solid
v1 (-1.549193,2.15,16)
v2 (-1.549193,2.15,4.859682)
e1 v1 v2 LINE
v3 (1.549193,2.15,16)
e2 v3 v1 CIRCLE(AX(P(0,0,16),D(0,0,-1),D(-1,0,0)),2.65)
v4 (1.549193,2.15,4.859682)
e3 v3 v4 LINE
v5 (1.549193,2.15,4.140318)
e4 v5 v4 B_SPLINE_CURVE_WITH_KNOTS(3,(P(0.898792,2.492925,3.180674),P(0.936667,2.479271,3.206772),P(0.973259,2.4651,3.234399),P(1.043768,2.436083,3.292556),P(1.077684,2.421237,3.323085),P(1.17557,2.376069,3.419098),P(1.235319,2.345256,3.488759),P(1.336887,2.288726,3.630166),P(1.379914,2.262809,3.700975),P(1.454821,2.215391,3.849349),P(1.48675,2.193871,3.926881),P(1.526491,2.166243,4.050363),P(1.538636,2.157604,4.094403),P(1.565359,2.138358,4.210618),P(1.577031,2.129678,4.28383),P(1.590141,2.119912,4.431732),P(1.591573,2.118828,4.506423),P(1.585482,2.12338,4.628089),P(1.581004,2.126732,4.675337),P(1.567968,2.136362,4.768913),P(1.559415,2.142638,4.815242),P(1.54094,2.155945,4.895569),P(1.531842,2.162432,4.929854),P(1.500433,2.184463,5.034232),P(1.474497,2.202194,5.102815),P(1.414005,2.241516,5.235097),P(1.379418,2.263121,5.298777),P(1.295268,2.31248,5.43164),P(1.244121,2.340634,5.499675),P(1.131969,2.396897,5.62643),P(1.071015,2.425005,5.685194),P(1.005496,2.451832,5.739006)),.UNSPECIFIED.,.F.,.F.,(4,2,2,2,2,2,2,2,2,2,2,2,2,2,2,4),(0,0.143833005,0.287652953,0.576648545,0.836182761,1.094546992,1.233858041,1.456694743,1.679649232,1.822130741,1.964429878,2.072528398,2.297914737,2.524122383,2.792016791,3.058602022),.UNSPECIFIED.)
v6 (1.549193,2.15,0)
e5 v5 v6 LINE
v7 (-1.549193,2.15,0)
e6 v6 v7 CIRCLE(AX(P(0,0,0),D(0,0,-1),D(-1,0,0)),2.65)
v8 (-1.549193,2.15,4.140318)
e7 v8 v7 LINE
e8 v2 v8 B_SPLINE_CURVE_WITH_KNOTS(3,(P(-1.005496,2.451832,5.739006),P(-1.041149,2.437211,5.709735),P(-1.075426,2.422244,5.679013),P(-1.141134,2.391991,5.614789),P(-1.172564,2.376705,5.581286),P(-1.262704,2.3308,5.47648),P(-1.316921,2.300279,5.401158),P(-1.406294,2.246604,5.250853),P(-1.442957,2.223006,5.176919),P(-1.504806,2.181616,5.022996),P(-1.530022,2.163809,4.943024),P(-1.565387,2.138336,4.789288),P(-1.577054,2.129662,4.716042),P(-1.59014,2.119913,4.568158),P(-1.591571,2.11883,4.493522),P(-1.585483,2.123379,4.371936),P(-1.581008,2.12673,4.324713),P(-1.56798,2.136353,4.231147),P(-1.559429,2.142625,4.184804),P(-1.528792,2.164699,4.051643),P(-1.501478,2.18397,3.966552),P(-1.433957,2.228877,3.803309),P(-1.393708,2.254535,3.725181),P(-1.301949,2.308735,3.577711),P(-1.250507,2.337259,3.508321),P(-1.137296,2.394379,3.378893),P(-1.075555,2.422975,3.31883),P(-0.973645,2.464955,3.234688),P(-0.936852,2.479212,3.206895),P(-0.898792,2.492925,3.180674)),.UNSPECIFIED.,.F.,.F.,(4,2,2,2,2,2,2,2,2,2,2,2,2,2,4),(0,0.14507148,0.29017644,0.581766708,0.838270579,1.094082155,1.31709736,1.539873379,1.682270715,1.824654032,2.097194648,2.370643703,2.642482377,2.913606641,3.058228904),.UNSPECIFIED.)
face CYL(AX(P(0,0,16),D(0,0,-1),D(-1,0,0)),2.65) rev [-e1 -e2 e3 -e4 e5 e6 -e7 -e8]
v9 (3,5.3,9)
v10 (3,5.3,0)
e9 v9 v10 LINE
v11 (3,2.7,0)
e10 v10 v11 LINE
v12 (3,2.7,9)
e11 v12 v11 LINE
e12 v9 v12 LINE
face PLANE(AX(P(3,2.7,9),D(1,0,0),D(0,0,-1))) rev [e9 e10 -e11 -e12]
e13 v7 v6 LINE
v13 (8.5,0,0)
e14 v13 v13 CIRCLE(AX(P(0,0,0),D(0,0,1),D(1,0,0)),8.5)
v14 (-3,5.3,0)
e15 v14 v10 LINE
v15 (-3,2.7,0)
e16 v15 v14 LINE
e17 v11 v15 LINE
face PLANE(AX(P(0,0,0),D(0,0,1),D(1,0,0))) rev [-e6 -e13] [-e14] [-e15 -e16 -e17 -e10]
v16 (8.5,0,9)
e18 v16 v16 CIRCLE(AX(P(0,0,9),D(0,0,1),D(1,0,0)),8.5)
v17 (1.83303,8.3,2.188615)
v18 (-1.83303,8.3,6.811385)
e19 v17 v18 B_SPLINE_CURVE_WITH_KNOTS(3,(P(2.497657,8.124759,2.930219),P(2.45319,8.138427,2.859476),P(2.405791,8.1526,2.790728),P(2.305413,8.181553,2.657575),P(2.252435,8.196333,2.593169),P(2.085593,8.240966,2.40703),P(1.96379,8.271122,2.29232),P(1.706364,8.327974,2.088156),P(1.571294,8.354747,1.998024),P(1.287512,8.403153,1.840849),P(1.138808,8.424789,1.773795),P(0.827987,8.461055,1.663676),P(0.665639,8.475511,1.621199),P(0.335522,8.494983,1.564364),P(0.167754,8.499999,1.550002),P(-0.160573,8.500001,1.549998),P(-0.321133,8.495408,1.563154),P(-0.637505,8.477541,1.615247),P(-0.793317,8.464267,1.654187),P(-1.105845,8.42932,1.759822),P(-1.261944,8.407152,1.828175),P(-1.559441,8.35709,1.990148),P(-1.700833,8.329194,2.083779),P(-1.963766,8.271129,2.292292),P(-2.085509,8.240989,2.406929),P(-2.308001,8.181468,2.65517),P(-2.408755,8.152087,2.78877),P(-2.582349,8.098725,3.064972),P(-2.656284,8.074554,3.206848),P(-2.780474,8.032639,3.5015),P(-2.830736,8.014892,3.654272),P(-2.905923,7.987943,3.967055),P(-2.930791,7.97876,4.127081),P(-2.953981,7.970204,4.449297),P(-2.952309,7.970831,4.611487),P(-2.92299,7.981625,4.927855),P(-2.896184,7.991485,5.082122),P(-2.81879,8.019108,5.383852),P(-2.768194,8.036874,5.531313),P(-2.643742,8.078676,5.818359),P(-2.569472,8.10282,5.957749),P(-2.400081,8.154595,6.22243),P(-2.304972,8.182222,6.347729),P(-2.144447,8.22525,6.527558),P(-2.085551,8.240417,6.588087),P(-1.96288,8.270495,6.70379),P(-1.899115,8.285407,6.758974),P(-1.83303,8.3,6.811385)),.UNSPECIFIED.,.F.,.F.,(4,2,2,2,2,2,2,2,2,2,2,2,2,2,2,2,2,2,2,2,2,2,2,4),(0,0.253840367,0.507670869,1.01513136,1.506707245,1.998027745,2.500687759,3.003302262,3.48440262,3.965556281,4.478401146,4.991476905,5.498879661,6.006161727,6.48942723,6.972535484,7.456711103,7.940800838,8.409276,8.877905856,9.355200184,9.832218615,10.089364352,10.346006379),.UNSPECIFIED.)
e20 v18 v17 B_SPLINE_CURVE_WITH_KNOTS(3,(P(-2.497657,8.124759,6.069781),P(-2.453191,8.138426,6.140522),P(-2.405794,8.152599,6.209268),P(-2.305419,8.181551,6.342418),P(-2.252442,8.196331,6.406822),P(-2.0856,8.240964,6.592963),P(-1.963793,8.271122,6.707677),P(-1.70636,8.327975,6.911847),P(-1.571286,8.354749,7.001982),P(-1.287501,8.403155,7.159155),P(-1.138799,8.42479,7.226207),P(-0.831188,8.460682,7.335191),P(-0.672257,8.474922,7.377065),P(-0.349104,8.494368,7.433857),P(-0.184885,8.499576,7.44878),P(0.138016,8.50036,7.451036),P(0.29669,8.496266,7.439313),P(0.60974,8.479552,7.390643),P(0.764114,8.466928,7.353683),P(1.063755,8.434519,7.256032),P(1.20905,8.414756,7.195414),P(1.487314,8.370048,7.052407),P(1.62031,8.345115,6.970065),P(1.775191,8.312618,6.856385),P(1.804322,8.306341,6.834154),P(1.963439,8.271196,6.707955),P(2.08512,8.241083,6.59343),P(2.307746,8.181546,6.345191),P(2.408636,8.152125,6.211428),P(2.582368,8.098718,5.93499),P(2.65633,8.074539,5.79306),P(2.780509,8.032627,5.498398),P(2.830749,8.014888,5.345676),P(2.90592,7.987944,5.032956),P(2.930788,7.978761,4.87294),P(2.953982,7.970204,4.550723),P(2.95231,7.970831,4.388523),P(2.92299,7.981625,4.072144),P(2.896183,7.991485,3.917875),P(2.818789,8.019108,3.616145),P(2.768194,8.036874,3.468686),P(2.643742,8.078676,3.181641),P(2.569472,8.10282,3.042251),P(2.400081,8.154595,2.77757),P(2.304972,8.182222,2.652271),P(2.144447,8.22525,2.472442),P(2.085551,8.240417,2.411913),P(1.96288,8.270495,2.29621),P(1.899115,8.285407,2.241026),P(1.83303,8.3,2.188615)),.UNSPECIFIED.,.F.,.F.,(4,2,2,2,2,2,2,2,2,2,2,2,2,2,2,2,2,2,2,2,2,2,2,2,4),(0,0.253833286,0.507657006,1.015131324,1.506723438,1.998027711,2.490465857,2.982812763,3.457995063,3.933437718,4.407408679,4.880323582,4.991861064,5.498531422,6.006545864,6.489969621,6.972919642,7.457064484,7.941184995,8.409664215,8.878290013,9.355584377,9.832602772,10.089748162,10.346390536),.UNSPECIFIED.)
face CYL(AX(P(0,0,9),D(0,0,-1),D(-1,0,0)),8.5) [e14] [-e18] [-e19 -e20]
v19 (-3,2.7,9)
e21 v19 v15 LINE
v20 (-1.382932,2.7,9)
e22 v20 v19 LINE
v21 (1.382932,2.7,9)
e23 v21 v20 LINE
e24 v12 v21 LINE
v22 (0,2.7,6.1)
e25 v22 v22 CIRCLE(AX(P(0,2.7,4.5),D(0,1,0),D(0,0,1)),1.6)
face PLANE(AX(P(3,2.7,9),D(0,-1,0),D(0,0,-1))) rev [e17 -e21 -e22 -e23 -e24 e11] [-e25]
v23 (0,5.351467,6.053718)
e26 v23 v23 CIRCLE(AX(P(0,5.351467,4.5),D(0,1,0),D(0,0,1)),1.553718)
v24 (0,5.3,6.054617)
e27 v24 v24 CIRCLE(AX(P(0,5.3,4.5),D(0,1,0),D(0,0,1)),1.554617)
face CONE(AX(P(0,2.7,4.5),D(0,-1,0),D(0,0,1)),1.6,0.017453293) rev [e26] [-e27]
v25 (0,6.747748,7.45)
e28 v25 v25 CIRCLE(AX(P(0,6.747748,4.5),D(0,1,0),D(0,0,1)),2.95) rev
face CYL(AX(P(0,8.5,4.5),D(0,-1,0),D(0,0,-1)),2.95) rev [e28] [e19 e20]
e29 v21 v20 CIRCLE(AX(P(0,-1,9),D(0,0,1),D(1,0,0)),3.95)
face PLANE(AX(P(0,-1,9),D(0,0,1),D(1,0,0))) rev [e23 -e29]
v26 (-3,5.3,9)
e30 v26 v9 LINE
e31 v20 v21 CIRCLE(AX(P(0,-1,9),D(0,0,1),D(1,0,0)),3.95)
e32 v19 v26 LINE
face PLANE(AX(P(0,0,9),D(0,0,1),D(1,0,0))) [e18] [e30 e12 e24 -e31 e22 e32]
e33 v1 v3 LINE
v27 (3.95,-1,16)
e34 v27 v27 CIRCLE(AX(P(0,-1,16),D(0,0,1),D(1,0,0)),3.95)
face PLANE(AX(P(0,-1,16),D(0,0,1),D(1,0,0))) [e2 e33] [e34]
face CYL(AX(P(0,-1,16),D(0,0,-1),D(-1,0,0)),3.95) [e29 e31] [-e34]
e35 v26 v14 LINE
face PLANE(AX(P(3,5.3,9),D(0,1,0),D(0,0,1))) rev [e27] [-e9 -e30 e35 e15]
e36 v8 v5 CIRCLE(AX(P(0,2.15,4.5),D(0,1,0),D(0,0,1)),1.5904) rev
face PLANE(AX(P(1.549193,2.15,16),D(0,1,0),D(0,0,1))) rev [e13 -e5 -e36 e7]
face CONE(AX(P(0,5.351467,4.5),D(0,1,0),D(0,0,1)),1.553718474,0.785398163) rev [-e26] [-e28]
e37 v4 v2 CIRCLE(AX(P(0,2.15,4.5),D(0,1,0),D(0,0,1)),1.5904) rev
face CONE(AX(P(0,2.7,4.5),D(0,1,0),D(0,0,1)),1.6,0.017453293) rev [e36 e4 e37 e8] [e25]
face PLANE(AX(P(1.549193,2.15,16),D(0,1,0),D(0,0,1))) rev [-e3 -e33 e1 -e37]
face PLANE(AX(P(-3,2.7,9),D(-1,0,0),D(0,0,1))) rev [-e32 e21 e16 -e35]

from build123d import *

# Parameters (mm, degrees)
ESQUISSE1_R             = 8.5
BOSS_EXTRU_1_DEPTH      = 9
ESQUISSE2_W             = 6
ESQUISSE2_H             = 2.6
ENL_V_MAT_EXTRU_1_DEPTH = 16.016657418
ESQUISSE7_R             = 2.95
ENL_V_MAT_EXTRU_8_DEPTH = 21.868397324
ESQUISSE9_R             = 3.95
BOSS_EXTRU_2_DEPTH      = 7
ENL_V_MAT_EXTRU_9_DEPTH = 21.012496182


with BuildPart() as part:
    # Esquisse1 → Boss.-Extru.1 (new body)
    with BuildSketch(Plane.XY):
        Circle(ESQUISSE1_R)
    extrude(amount=BOSS_EXTRU_1_DEPTH)

    # Esquisse2 → Enlèv. mat.-Extru.1 (cut, through all)
    with BuildSketch(Plane(origin=(0, 0, 0), x_dir=(-1, 0, 0), z_dir=(0, 0, -1))):
        with Locations((0, 4)):
            Rectangle(ESQUISSE2_W, ESQUISSE2_H)
    extrude(amount=-ENL_V_MAT_EXTRU_1_DEPTH, mode=Mode.SUBTRACT)

    # Enlèv. mat.-Extru.2: read off the stored shape, not the designer's step
    # Enlèv. mat.-Extru.2 outline → Enlèv. mat.-Extru.2 (revolve, cut)
    with BuildSketch(Plane.XY.offset(4.5)):
        Polygon((0, 5.3), (1.554616831, 5.3), (1.498760014, 8.500034923), (0, 8.500034923), align=None)
        Polygon((1.6, 2.7), (0, 2.7), (0, 0.7), (1.56508987, 0.7), align=None)
    revolve(axis=Axis((0, 0, 4.5), (0, 1, 0)), mode=Mode.SUBTRACT)

    # Esquisse7 → Enlèv. mat.-Extru.8 (cut, through all)
    with BuildSketch(Plane(origin=(0, 8.3, 0), x_dir=(1, 0, 0), z_dir=(0, 1, 0))):
        with Locations((0, -4.5)):
            Circle(ESQUISSE7_R)
    extrude(amount=ENL_V_MAT_EXTRU_8_DEPTH, mode=Mode.SUBTRACT)

    # Chanfrein1: read off the stored shape, not the designer's step
    # Chanfrein1 outline → Chanfrein1 (revolve, cut)
    with BuildSketch(Plane.XY.offset(4.5)):
        Polygon((2.95, 6.747748364), (2.95, 8.3), (1.502251636, 8.3), (1.553718474, 5.351466838), align=None)
    revolve(axis=Axis((0, 0, 4.5), (0, 1, 0)), mode=Mode.SUBTRACT)

    # Esquisse9 → Boss.-Extru.2 (add)
    with BuildSketch(Plane.XY.offset(9)):
        with Locations(Location((0, -1, 0), (0, 0, 110.493999506))):
            Circle(ESQUISSE9_R)
    extrude(amount=BOSS_EXTRU_2_DEPTH)

    # Esquisse10 → Enlèv. mat.-Extru.9 (cut, through all)
    with BuildSketch(Plane(origin=(0, 0, 0), x_dir=(-1, 0, 0), z_dir=(0, 0, -1))):
        with BuildLine():
            Line((-1.549193338, 2.15), (1.549193338, 2.15))
            ThreePointArc((1.549193338, 2.15), (0, -2.65), (-1.549193338, 2.15))
        make_face()
    extrude(amount=-ENL_V_MAT_EXTRU_9_DEPTH, mode=Mode.SUBTRACT)


solid = part.part
